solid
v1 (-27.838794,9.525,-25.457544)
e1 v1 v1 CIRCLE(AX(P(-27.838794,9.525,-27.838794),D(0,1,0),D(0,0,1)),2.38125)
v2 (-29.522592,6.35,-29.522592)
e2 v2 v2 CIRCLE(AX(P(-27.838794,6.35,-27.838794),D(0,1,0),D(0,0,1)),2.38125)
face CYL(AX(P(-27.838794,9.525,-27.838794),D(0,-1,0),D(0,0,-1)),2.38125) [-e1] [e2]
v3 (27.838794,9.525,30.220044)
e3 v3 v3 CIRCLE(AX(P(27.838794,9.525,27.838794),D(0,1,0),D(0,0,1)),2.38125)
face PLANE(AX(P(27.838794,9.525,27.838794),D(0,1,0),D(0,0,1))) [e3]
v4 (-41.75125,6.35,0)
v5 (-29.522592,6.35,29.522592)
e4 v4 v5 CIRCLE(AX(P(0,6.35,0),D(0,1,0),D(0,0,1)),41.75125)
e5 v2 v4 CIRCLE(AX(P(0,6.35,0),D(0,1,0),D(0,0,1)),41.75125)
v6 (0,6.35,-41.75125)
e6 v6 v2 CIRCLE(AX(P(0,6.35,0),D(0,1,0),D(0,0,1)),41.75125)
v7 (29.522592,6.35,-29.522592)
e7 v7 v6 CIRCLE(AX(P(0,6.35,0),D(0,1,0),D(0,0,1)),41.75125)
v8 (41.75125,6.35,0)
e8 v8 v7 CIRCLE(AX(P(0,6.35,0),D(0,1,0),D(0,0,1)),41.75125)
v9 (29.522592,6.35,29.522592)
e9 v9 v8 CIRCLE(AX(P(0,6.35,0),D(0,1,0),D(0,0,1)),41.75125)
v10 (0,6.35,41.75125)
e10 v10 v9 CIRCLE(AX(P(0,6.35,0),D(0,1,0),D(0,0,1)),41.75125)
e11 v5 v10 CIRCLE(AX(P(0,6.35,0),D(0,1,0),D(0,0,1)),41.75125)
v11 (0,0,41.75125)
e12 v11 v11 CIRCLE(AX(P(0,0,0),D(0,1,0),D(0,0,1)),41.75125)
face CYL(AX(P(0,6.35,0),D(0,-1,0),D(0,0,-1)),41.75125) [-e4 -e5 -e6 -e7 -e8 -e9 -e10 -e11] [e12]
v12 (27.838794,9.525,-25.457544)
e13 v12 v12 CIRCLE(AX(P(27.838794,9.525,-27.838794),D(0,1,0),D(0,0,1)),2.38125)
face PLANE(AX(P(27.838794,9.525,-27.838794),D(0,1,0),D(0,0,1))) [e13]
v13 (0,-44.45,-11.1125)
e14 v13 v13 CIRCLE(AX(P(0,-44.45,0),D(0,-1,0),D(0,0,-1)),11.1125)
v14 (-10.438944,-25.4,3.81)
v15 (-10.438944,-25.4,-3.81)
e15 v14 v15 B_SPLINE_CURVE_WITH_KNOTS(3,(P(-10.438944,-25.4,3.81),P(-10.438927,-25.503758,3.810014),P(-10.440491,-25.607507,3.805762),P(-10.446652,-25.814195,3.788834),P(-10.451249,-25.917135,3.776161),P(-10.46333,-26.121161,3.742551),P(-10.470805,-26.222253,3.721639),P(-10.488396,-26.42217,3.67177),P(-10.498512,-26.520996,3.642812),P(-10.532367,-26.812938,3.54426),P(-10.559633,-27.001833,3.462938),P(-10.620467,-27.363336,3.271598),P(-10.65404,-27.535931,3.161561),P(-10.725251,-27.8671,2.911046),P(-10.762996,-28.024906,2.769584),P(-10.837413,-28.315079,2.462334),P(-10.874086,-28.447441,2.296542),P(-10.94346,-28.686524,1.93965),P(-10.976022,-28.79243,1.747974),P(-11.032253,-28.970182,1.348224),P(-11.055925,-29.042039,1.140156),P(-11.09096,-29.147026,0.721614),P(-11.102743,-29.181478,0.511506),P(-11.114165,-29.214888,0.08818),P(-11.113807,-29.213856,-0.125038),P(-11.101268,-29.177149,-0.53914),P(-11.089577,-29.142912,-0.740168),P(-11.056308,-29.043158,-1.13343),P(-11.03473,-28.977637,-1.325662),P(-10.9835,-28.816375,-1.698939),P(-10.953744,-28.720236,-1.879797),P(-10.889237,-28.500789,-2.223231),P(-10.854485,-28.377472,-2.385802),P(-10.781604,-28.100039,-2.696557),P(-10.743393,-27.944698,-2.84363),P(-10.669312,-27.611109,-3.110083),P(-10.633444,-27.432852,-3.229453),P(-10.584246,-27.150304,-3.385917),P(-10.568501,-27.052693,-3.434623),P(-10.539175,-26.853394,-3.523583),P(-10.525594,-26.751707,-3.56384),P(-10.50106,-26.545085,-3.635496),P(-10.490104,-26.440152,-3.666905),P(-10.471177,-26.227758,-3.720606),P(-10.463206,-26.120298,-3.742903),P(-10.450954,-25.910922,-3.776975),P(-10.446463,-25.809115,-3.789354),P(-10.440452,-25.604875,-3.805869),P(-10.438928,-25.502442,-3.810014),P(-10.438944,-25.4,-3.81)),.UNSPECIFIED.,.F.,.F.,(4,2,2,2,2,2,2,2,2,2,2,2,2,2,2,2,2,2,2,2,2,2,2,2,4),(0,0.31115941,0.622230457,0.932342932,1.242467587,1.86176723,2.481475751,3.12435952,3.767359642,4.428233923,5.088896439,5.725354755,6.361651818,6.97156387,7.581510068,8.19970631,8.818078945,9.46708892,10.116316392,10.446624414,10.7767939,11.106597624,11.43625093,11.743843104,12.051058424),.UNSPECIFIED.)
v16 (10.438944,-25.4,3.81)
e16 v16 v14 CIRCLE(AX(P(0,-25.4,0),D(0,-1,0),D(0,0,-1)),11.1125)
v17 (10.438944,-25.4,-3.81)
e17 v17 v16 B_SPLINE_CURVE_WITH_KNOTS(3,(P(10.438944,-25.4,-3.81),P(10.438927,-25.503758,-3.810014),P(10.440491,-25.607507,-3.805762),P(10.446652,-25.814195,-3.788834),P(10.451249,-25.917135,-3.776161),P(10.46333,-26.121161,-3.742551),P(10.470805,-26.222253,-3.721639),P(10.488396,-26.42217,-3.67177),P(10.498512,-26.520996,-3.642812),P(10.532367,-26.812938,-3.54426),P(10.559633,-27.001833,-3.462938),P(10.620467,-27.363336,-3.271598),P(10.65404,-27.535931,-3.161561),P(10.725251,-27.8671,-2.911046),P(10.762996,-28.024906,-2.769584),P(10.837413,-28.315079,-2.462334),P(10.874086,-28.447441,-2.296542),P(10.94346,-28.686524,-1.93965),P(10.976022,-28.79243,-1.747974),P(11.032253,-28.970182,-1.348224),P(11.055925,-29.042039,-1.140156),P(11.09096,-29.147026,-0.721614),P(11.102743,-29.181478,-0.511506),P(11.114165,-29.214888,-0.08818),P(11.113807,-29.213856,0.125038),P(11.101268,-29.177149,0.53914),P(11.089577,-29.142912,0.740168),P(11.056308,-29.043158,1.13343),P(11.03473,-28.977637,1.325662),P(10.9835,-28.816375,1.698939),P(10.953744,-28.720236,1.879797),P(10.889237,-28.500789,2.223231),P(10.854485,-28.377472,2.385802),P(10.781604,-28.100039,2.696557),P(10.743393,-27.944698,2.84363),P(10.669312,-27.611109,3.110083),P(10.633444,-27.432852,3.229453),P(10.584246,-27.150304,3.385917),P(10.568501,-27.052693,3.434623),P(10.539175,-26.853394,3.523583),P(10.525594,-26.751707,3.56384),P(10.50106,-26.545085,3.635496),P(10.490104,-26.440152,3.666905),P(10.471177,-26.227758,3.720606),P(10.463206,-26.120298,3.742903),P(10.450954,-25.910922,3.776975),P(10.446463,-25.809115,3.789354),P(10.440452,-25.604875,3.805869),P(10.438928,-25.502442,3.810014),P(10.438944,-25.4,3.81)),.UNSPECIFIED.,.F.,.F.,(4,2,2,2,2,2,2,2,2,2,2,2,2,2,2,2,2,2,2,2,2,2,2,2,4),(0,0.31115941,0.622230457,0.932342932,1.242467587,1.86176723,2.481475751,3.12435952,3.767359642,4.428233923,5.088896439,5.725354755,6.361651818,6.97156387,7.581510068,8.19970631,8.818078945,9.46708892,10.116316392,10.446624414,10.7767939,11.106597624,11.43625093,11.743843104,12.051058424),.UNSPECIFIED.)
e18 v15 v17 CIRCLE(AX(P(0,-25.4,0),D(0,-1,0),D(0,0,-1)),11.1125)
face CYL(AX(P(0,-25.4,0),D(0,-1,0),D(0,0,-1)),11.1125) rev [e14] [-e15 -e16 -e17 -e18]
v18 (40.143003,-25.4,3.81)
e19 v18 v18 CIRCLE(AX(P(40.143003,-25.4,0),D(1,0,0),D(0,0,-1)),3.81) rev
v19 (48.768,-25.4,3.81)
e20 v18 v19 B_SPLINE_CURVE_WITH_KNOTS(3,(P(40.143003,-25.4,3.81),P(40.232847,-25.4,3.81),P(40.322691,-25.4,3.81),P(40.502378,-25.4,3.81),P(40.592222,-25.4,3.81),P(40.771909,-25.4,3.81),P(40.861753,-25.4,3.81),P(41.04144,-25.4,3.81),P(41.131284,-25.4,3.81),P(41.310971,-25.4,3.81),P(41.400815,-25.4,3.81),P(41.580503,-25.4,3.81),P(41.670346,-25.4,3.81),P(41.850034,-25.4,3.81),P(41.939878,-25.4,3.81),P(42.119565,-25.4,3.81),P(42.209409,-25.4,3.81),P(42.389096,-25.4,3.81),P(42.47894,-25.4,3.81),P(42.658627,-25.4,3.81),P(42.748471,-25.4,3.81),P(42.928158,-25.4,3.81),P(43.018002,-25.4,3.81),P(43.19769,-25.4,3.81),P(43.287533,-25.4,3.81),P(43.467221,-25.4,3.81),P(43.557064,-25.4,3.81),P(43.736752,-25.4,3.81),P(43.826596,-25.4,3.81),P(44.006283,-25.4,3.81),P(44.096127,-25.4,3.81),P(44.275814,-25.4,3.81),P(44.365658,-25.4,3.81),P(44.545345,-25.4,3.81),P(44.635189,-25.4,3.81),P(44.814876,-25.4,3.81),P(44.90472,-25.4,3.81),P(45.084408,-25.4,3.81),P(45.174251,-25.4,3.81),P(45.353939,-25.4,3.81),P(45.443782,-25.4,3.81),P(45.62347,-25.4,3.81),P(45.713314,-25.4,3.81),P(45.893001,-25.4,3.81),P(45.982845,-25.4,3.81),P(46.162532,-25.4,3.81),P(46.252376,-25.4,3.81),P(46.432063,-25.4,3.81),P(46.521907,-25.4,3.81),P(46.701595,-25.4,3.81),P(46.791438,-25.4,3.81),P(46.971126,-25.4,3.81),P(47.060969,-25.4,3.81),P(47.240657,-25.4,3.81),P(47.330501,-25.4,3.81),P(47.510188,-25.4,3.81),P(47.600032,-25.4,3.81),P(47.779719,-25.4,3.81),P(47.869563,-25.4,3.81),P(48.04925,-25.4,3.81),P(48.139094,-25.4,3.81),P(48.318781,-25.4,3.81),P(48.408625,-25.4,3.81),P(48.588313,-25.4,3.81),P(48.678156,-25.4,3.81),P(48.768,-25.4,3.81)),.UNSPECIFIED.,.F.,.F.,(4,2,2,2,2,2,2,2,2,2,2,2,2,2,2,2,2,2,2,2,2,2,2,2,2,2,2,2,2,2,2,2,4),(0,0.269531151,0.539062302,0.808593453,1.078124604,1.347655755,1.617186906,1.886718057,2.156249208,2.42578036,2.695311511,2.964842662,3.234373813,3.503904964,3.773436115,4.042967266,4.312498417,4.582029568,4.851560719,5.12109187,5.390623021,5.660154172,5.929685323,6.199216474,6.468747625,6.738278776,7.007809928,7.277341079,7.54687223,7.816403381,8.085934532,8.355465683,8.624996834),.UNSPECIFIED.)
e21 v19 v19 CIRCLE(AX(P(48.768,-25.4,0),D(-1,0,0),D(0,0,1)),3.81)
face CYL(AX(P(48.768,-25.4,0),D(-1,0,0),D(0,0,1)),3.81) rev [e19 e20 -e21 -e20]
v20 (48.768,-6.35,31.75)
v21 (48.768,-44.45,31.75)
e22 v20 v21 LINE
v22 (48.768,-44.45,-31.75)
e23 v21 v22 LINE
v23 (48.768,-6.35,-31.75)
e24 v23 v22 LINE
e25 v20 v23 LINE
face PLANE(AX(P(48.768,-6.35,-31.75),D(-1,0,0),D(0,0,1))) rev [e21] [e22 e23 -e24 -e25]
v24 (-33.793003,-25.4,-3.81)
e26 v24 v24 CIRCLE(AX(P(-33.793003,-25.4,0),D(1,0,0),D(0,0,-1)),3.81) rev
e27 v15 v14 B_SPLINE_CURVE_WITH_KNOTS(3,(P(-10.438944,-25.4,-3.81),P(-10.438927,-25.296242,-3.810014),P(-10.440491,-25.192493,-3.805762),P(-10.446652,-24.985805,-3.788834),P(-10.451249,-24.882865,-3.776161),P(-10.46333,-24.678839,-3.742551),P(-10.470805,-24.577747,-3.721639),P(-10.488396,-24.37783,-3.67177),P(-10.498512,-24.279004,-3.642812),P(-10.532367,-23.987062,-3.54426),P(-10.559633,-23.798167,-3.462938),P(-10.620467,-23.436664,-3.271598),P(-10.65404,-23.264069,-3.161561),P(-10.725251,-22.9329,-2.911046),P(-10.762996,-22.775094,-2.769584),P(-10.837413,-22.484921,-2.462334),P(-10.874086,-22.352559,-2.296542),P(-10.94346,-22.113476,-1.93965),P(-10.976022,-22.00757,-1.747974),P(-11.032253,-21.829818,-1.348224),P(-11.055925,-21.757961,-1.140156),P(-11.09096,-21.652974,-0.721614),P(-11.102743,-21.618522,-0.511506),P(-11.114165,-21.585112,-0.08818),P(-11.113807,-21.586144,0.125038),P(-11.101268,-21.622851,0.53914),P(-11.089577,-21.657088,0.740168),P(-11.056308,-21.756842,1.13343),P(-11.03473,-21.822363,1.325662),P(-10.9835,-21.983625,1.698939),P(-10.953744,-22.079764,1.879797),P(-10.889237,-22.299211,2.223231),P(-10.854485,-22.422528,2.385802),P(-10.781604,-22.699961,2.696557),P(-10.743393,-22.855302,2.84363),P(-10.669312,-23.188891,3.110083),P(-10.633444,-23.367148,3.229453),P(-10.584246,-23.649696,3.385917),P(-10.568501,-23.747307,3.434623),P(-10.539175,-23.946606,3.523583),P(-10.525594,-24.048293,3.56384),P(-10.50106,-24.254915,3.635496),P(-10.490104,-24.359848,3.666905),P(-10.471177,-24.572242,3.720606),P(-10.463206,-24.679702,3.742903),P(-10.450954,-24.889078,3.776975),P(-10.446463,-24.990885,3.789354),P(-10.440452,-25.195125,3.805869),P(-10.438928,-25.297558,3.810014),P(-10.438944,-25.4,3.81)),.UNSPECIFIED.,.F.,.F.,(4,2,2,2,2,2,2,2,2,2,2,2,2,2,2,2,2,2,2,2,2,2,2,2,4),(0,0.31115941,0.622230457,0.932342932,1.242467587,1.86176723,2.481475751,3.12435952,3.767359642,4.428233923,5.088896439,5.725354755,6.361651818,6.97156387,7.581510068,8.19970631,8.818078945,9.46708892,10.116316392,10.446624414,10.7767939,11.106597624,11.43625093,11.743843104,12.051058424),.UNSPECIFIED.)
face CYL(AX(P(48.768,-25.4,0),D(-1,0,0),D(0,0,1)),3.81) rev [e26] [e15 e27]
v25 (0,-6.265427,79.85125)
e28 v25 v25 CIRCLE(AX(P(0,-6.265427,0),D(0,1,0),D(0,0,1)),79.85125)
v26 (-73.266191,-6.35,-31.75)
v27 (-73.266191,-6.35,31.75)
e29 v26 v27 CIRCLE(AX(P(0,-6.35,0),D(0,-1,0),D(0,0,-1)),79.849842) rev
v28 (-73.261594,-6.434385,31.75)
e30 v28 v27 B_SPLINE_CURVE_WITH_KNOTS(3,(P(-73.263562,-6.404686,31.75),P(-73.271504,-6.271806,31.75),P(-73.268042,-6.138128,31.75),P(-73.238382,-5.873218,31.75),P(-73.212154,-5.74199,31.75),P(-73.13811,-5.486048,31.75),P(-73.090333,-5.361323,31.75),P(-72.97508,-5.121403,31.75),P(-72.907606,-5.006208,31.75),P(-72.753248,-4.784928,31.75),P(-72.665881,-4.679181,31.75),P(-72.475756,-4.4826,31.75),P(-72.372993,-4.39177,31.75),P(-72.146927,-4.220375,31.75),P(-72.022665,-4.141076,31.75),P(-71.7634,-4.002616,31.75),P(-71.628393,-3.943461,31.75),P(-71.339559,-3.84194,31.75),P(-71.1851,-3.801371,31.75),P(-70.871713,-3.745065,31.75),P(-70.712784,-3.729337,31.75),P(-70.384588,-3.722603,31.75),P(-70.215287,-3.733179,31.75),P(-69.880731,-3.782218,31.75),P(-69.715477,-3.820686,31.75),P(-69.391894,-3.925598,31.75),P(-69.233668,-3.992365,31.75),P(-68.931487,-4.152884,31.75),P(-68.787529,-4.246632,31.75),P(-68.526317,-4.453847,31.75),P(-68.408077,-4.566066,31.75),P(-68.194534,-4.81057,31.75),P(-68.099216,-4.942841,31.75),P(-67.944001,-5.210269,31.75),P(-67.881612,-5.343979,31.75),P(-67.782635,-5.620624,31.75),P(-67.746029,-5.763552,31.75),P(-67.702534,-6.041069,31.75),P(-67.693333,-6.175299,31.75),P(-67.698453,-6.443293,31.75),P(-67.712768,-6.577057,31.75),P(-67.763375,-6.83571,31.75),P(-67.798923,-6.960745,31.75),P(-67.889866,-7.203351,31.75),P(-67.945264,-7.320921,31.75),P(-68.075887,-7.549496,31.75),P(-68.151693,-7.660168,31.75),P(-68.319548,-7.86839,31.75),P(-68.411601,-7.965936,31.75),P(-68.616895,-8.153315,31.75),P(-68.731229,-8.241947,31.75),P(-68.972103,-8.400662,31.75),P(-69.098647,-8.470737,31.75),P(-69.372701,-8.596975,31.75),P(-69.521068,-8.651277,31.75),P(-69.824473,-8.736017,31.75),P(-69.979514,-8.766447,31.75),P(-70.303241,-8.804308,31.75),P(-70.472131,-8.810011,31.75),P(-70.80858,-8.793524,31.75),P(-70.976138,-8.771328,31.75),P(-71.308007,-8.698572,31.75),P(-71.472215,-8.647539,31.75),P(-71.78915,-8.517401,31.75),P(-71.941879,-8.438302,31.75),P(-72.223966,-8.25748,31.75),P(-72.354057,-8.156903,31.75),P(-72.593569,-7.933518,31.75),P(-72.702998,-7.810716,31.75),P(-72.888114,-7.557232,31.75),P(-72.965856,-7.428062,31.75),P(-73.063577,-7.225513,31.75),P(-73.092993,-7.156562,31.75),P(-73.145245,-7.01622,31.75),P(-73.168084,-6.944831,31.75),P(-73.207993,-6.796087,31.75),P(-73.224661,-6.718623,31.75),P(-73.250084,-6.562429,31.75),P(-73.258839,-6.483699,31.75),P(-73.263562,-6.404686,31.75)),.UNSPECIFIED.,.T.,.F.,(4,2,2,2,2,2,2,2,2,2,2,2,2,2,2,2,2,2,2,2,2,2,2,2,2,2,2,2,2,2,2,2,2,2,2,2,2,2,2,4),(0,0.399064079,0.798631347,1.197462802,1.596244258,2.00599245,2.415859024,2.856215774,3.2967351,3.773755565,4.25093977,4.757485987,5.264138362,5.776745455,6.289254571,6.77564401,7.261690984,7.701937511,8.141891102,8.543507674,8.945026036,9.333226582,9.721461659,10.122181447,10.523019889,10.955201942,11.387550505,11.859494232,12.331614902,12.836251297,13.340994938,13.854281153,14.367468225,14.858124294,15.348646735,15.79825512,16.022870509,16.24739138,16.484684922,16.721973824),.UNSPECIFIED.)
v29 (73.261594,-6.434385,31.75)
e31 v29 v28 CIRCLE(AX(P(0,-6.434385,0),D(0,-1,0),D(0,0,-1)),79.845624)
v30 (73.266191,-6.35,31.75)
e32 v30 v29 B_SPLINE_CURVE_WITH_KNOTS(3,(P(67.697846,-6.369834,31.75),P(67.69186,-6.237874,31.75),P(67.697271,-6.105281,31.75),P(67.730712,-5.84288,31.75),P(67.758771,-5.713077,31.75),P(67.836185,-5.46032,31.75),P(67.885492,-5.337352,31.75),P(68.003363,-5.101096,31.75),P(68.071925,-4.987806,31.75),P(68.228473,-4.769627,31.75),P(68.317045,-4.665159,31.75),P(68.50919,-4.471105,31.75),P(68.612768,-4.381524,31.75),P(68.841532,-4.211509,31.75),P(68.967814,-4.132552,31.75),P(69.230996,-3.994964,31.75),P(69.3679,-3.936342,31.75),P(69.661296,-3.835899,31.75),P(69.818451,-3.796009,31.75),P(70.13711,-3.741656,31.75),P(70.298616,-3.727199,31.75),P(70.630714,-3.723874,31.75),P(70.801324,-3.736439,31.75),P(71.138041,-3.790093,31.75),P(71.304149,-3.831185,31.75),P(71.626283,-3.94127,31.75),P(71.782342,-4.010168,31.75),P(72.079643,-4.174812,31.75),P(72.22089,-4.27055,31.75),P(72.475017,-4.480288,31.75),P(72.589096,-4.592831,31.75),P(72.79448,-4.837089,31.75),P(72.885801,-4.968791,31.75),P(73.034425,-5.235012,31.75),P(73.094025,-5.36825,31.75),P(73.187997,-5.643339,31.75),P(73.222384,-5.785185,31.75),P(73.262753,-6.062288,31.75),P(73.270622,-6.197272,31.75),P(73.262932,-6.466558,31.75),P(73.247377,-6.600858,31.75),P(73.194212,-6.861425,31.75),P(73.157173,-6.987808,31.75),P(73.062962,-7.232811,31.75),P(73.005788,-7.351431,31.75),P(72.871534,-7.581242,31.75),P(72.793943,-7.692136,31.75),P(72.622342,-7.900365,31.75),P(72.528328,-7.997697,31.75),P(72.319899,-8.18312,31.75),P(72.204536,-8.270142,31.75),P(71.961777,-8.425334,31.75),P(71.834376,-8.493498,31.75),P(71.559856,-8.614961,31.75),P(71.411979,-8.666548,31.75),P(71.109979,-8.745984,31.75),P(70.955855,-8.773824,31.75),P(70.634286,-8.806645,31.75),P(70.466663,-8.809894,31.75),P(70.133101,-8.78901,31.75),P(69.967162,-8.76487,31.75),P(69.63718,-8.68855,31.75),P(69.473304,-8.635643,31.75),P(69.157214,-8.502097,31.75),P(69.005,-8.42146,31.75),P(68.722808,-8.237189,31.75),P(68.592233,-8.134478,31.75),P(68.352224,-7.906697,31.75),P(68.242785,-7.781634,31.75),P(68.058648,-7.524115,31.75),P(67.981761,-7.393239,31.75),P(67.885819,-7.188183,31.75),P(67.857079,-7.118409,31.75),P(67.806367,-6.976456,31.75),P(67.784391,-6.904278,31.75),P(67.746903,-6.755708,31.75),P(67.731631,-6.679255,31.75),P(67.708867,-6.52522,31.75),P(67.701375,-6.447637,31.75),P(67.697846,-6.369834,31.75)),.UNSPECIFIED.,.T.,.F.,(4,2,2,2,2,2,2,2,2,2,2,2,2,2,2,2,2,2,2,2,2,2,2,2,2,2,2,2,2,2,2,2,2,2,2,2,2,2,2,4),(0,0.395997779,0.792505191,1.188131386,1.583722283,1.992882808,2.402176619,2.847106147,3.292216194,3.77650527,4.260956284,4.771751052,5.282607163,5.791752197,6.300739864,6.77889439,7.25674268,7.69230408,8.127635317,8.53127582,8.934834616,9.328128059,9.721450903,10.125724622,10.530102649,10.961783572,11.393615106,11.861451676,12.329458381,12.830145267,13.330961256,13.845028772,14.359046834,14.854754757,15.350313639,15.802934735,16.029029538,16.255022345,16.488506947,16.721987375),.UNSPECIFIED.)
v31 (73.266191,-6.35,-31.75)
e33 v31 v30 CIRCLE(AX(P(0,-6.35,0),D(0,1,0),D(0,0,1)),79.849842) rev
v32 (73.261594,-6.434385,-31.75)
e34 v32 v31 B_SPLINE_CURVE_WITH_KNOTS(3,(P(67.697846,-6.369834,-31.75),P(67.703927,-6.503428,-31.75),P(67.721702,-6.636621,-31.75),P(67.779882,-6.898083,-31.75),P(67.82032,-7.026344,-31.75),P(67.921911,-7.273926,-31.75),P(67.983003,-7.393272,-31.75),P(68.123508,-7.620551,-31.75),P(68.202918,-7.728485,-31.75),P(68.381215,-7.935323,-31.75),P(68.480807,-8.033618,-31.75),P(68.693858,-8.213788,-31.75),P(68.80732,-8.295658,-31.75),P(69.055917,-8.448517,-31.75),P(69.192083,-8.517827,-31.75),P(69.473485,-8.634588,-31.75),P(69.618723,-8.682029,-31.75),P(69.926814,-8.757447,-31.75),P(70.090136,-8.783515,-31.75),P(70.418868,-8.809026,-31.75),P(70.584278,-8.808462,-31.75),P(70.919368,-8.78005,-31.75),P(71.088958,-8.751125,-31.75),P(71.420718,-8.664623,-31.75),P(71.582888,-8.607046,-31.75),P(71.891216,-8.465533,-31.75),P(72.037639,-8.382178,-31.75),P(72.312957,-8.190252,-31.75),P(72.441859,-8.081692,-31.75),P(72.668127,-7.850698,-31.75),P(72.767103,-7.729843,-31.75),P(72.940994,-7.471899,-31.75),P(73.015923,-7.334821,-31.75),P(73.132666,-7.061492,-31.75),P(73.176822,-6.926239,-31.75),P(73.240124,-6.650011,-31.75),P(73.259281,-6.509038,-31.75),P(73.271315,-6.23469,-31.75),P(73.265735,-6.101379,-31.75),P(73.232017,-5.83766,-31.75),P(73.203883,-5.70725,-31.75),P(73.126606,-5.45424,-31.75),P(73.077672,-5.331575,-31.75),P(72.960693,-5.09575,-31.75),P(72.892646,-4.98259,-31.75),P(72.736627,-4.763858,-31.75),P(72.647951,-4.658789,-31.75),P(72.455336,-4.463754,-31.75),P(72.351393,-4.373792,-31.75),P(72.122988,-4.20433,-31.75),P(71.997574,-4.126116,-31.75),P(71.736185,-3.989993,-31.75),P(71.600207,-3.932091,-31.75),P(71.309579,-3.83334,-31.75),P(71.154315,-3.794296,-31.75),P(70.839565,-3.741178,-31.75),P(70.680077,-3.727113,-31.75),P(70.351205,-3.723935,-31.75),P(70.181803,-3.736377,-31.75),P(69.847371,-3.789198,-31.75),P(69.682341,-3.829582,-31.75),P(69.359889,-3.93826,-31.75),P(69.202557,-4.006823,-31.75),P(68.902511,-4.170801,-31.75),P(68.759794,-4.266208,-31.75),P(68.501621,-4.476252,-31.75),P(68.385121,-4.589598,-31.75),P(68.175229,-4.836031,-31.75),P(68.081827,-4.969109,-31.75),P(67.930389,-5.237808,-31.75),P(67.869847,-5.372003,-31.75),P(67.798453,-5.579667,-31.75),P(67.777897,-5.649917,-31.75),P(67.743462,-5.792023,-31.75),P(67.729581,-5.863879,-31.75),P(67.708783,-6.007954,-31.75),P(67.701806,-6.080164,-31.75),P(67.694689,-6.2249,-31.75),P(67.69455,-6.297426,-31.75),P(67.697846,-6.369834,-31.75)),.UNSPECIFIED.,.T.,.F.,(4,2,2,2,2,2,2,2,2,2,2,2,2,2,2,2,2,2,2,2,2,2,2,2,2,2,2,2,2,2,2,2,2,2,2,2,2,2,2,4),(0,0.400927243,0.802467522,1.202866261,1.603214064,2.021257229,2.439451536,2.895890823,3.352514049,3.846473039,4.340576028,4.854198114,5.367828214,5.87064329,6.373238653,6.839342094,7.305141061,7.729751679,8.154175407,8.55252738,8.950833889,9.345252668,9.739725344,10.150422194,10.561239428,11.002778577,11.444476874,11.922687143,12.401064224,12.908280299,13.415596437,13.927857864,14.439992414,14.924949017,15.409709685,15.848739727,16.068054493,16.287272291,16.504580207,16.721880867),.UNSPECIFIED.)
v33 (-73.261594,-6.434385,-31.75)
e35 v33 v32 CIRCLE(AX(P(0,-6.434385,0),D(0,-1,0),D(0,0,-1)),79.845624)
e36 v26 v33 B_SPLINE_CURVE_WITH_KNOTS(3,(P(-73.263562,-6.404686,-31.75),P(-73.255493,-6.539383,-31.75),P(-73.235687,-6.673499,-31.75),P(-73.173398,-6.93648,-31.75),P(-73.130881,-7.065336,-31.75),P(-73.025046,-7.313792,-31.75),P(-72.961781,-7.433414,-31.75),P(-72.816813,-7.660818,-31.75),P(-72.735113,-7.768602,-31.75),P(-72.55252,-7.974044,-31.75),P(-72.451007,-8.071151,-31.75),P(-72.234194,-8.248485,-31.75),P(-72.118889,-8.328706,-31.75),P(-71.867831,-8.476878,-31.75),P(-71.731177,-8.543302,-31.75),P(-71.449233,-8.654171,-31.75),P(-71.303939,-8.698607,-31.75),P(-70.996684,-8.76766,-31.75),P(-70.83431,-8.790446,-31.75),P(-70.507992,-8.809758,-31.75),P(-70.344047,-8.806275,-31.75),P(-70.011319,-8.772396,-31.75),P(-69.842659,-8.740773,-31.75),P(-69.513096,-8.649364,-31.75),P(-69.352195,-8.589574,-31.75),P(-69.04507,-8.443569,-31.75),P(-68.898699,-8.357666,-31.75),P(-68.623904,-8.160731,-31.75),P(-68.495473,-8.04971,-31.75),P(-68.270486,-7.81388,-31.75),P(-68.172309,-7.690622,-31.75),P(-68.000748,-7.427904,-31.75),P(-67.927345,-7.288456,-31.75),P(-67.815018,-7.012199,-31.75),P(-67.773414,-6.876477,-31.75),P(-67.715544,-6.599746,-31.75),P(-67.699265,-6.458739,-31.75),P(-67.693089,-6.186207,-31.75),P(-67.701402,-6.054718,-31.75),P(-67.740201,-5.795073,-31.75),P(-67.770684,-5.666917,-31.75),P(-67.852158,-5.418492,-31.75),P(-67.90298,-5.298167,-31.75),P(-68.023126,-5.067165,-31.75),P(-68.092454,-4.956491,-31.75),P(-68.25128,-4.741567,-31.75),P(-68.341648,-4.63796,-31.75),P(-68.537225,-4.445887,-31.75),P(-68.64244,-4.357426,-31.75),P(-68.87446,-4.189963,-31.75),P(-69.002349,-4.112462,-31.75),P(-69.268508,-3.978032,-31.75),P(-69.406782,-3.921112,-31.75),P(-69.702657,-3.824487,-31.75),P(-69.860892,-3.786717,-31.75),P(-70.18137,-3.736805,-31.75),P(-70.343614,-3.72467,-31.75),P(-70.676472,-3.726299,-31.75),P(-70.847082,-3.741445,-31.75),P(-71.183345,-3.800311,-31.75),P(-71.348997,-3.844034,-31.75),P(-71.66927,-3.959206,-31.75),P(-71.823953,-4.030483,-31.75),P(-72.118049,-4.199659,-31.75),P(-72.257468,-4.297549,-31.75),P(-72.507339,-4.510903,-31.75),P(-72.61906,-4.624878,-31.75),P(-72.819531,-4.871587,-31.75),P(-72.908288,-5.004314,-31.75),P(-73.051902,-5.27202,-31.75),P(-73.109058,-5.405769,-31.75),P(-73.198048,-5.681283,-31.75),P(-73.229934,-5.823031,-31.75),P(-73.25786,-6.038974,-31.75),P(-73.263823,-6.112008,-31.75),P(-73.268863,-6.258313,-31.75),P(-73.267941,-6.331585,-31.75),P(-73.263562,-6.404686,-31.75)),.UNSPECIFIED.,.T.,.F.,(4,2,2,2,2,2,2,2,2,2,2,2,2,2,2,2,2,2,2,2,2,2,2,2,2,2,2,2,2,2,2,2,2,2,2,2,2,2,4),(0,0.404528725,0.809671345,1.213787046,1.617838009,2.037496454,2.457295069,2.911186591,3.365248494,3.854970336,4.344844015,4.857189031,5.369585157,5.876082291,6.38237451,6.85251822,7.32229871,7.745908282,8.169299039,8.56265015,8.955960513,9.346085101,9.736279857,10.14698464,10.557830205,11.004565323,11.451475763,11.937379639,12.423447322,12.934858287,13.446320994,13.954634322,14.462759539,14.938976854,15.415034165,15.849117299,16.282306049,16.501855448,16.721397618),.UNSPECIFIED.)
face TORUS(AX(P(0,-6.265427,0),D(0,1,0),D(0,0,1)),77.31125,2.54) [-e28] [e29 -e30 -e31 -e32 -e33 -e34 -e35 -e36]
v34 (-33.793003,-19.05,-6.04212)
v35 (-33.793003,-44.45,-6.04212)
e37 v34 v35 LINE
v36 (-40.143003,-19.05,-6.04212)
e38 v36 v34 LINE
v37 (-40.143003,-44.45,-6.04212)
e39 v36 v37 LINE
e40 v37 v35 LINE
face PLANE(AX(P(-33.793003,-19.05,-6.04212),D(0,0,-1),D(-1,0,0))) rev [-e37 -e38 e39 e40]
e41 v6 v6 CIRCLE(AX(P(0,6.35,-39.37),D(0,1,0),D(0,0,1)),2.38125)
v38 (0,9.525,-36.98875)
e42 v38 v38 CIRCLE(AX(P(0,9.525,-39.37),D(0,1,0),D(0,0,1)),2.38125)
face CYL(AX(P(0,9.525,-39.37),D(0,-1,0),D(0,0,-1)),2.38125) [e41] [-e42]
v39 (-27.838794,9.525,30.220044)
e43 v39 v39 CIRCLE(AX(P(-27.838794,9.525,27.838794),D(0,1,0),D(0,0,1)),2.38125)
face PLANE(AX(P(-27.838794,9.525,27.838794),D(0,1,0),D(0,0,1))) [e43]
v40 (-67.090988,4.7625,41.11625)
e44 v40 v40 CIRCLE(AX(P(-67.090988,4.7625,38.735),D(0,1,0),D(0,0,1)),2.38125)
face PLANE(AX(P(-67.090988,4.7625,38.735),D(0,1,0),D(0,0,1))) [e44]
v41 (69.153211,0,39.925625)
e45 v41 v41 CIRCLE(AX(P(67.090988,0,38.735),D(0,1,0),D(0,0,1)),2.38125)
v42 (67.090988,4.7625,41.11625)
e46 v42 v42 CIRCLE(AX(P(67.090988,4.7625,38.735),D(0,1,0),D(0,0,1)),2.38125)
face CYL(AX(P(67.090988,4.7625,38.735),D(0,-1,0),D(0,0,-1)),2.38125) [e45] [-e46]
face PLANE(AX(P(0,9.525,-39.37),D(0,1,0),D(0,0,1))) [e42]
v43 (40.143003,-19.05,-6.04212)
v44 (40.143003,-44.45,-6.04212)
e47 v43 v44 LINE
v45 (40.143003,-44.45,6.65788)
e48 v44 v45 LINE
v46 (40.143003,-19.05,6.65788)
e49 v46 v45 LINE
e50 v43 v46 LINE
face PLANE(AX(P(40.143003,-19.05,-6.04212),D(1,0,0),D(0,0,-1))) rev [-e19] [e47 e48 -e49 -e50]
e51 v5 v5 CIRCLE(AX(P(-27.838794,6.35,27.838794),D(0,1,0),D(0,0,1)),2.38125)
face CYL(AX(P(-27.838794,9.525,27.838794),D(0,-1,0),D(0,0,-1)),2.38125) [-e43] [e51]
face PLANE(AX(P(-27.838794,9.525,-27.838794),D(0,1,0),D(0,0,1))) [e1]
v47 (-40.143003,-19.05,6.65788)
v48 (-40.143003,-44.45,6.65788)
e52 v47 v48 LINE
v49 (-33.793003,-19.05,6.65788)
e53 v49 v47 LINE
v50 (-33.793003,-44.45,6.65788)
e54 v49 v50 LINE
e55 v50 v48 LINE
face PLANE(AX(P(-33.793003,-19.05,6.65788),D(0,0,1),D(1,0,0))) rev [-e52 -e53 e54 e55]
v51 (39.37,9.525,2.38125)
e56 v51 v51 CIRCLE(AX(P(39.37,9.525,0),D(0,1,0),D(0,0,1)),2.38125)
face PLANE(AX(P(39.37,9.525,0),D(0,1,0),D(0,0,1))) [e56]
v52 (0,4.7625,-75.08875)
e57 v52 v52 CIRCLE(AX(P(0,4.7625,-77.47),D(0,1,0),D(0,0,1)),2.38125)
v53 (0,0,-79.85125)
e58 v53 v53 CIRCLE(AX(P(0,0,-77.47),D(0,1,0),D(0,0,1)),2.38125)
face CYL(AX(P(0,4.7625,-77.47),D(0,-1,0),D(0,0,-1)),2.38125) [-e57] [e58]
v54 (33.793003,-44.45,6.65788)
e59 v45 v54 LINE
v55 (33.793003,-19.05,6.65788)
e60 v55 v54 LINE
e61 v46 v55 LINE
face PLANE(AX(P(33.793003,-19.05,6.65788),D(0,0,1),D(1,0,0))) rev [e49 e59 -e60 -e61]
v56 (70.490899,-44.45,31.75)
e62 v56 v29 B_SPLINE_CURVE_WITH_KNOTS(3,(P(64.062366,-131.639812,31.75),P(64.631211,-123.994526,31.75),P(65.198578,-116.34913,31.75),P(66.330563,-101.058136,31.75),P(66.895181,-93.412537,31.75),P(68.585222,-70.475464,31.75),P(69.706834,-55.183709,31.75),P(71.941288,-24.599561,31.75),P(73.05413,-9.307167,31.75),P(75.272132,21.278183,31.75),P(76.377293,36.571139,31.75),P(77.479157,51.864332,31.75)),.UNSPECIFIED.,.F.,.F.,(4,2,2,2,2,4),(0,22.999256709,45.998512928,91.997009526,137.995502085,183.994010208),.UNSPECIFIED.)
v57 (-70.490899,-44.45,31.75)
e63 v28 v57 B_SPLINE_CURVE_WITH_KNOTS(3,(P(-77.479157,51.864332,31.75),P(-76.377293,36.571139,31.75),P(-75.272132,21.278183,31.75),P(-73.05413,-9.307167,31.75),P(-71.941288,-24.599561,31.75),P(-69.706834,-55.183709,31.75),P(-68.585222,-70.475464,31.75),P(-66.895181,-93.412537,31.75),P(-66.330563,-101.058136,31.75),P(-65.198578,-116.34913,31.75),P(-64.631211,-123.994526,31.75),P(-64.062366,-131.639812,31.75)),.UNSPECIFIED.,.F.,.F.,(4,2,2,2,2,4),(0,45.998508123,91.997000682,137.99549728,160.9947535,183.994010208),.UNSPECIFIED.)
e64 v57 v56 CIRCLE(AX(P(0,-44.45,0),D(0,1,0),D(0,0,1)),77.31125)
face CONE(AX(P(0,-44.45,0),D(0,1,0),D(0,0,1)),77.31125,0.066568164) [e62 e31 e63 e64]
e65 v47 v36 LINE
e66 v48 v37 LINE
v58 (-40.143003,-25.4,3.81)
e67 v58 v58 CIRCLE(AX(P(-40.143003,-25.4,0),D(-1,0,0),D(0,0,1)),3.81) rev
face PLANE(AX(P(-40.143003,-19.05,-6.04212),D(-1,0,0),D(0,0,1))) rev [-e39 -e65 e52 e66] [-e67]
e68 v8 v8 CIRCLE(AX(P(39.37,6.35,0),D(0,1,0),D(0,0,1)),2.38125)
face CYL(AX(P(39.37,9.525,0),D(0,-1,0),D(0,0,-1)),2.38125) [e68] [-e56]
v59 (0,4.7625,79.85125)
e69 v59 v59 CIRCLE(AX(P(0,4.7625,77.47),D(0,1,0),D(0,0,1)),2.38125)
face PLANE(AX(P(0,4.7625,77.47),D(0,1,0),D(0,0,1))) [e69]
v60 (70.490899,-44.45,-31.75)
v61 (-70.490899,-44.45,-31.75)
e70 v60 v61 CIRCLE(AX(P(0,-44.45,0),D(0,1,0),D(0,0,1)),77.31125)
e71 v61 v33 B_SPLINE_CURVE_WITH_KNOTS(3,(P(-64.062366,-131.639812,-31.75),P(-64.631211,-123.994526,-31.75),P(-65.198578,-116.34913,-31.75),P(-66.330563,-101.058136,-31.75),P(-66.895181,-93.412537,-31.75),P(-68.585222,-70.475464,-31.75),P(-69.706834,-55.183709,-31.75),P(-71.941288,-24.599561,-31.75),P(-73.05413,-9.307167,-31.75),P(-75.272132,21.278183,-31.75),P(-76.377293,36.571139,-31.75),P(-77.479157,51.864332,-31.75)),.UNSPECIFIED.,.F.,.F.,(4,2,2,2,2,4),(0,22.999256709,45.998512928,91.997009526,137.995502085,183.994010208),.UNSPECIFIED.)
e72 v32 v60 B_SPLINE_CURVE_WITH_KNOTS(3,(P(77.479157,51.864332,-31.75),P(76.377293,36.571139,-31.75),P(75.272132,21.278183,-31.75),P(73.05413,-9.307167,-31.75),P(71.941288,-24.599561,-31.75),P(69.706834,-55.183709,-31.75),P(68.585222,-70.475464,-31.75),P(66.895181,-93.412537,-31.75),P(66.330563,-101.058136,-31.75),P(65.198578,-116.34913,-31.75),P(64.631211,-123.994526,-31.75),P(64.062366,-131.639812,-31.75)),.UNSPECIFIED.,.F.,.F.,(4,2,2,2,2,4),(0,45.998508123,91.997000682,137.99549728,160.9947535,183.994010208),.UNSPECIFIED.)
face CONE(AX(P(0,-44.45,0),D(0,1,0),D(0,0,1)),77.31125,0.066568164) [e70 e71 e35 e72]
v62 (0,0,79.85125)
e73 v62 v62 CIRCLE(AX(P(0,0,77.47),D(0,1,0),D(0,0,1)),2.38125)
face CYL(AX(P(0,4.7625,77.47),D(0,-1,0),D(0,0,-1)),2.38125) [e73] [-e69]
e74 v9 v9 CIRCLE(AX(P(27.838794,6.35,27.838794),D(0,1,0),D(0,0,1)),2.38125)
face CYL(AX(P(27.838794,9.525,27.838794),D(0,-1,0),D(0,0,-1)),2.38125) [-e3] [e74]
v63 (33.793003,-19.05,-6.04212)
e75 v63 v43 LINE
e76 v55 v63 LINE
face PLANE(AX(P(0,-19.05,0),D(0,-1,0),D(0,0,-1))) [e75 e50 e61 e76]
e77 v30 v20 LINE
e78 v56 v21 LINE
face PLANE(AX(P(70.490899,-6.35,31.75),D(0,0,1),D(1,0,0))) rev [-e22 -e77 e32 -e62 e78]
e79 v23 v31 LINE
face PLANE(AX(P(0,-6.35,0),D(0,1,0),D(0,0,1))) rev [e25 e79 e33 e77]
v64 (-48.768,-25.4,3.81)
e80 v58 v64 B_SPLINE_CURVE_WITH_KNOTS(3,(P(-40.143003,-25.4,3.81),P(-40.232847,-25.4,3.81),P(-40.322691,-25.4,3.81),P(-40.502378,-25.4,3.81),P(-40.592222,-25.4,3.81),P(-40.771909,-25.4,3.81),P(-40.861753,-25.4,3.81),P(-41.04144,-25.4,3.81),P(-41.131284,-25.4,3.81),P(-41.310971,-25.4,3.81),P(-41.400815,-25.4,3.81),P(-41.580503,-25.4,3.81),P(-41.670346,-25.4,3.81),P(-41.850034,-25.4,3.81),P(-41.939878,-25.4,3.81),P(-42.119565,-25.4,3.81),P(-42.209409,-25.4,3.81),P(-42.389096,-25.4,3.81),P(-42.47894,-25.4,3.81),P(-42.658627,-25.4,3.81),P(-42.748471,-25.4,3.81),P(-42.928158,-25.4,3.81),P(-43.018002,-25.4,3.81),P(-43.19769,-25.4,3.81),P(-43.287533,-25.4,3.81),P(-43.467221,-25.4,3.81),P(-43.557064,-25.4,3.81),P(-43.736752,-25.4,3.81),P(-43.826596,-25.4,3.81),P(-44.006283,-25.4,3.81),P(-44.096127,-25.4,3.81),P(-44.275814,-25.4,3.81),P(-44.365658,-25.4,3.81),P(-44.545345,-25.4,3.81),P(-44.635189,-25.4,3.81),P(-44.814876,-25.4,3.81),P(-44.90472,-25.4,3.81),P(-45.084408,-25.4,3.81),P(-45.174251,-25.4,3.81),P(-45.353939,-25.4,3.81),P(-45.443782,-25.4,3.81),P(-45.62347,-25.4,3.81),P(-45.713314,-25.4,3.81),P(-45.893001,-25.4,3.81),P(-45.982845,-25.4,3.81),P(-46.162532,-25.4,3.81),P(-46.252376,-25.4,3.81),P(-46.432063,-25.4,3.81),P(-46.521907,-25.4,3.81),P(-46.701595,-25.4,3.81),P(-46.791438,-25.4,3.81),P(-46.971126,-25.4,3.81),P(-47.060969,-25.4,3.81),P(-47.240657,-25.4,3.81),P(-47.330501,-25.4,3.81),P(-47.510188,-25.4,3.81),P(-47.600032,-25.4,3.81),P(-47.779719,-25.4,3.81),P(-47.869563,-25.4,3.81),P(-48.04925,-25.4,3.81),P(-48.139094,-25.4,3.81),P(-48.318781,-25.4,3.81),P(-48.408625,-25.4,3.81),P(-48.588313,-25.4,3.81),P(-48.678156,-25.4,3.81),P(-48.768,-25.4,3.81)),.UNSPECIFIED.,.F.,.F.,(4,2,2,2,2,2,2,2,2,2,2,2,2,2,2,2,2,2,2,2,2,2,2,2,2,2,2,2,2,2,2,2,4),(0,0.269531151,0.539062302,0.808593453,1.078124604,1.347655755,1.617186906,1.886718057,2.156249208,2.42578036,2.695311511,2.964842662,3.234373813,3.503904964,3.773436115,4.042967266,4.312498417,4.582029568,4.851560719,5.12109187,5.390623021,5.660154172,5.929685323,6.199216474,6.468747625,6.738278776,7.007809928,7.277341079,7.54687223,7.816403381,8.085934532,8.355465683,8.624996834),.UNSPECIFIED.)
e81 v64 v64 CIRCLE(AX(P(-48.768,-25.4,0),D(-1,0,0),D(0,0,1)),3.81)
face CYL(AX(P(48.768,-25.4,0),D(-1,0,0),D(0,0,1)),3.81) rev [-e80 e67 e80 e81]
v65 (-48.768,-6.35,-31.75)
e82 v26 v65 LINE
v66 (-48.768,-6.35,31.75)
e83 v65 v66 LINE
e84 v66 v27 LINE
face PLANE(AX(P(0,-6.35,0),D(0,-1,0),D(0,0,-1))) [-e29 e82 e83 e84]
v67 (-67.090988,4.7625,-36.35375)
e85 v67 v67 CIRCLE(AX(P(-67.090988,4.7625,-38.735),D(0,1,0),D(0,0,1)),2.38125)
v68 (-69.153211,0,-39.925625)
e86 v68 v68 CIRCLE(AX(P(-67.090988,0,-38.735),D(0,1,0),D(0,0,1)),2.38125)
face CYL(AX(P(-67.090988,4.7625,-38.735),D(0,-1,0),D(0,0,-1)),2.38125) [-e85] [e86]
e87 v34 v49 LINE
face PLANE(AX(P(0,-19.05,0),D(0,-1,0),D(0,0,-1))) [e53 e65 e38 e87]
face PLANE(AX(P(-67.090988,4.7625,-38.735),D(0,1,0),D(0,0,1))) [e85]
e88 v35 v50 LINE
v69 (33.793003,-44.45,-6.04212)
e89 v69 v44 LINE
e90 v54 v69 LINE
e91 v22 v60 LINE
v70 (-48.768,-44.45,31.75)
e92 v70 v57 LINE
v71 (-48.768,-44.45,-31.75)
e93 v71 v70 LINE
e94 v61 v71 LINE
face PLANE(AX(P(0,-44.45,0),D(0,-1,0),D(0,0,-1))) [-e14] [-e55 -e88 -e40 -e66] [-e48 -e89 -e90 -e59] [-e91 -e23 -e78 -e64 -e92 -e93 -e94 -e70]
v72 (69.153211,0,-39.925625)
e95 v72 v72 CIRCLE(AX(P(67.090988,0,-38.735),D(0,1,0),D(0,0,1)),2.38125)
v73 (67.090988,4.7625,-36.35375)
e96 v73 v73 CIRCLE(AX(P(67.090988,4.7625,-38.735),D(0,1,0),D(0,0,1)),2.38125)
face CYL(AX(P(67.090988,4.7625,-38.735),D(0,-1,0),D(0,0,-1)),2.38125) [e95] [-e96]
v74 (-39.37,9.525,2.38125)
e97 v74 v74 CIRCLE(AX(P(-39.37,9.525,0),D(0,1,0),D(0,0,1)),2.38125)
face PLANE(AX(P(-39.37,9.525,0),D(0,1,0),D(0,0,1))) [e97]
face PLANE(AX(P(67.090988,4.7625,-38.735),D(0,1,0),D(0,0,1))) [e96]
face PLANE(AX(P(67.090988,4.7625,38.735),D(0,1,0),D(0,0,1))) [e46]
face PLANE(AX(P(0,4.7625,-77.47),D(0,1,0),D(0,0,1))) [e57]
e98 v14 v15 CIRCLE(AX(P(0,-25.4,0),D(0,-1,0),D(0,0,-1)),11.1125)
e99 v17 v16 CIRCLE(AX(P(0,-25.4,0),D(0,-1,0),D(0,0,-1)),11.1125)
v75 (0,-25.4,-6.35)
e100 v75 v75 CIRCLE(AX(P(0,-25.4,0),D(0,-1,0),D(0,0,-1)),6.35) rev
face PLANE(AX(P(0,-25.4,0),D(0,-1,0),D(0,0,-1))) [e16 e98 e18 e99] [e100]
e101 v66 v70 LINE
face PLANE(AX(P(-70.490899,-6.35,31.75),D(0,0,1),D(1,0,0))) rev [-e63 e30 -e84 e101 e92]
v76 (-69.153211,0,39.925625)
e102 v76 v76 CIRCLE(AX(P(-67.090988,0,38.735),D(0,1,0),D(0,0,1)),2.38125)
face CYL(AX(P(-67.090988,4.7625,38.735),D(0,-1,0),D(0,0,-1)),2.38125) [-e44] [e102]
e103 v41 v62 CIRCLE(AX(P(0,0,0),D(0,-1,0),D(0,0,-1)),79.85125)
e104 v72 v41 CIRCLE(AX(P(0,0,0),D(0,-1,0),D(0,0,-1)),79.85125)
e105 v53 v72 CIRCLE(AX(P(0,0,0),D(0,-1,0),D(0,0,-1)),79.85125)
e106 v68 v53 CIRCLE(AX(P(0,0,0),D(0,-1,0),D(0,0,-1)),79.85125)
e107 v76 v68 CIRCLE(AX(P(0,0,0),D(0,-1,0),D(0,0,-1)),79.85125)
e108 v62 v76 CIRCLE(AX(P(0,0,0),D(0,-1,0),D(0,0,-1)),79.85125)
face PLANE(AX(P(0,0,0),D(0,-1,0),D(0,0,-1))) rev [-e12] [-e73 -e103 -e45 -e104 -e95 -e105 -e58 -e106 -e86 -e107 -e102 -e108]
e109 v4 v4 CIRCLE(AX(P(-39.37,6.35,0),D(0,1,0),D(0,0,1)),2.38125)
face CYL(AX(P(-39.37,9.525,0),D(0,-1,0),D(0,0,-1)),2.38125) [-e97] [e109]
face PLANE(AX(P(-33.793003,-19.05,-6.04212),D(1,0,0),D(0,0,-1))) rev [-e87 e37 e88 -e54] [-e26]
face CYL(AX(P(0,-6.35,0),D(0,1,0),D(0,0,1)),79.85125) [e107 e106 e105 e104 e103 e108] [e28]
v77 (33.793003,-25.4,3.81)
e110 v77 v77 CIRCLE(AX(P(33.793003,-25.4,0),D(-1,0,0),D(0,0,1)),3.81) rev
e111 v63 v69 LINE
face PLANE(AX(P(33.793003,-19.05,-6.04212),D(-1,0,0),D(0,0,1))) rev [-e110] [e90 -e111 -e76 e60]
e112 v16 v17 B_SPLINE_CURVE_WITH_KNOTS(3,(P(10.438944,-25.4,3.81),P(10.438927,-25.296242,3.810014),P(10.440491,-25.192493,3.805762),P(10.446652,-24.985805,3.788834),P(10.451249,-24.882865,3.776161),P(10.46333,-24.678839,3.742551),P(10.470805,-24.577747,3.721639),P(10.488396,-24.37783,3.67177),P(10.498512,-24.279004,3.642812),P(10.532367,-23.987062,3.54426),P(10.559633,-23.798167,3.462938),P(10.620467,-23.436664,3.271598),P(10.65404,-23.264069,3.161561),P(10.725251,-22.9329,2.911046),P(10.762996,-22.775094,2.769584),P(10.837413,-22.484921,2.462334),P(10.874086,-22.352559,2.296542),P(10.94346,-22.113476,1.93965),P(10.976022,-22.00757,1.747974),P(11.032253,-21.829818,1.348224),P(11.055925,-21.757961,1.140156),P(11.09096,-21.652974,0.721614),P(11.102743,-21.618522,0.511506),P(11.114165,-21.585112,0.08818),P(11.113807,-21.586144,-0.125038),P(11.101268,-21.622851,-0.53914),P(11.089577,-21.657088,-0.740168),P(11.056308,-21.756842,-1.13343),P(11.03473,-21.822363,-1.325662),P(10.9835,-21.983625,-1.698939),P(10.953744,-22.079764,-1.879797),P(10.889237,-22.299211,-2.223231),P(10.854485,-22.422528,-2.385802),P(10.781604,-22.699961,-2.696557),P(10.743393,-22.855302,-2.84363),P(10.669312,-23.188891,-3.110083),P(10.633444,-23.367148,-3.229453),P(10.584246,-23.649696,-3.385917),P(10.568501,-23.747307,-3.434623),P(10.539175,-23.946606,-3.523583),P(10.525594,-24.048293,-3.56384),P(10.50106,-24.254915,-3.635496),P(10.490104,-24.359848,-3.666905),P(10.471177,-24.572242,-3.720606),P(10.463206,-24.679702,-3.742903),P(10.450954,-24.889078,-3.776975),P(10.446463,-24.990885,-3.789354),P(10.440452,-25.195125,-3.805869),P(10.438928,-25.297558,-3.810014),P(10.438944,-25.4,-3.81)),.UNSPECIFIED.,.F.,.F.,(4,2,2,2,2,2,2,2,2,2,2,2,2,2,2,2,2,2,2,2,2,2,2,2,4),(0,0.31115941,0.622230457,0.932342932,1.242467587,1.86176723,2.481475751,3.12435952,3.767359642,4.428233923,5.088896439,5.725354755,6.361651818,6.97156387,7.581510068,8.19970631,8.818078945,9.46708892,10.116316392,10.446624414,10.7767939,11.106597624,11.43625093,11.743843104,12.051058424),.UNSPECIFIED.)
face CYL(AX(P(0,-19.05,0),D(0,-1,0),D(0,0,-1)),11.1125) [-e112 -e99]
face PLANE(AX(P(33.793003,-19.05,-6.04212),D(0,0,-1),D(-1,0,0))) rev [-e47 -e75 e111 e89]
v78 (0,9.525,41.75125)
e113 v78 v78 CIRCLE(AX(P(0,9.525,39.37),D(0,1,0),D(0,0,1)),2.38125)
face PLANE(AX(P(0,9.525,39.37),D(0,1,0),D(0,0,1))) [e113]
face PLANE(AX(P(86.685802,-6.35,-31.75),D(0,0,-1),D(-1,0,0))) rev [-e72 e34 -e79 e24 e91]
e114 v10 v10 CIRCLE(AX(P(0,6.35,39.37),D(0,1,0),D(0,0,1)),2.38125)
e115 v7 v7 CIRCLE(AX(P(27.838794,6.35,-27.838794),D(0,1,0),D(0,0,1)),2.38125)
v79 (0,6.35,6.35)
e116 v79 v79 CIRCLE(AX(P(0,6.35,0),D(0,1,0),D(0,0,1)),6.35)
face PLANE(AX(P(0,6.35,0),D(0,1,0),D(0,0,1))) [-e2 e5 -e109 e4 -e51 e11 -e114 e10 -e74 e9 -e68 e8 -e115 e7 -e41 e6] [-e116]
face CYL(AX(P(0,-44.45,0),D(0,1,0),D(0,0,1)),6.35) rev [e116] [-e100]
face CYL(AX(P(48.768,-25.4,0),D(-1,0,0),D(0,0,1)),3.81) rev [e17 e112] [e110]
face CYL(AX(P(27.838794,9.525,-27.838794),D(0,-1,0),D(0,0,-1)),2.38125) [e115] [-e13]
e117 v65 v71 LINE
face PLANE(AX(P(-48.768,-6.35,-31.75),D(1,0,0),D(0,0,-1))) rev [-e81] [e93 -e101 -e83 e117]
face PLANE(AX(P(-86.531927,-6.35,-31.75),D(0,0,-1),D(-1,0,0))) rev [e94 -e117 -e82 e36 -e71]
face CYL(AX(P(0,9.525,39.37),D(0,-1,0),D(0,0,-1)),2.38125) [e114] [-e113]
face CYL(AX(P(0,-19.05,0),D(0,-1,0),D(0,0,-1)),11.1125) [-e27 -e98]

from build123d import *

# Parameters (mm, degrees)
SKETCH1_R           = 41.75125
BOSS_EXTRUDE1_DEPTH = 6.35
SKETCH2_R           = 2.38125
BOSS_EXTRUDE2_DEPTH = 3.175
SKETCH3_R           = 79.85125
BOSS_EXTRUDE3_DEPTH = 6.35
SKETCH4_R           = 2.38125
BOSS_EXTRUDE4_DEPTH = 4.7625
SKETCH5_R           = 77.31125
BOSS_EXTRUDE5_DEPTH = 38.1
FILLET1_R           = 2.54
CUT_EXTRUDE1_DEPTH  = 38.1
SKETCH8_R           = 3.81
CUT_EXTRUDE2_DEPTH  = 97.536
SKETCH9_R           = 6.35
CUT_EXTRUDE3_DEPTH  = 50.8
SKETCH10_R          = 11.1125
CUT_EXTRUDE4_DEPTH  = 19.05
SKETCH11_W          = 6.35
SKETCH11_H          = 12.7
CUT_EXTRUDE5_DEPTH  = 25.4
SKETCH12_R          = 11.1125
SKETCH12_R_2        = 6.35
BOSS_EXTRUDE6_DEPTH = 6.35


with BuildPart() as part:
    # Sketch1 → Boss-Extrude1 (new body)
    with BuildSketch(Plane(origin=(0, 0, 0), x_dir=(1, 0, 0), z_dir=(0, 1, 0))):
        with Locations(Location((0, 0, 0), (0, 0, 270))):
            Circle(SKETCH1_R)
    extrude(amount=BOSS_EXTRUDE1_DEPTH)

    # Sketch2 → Boss-Extrude2 (add)
    with BuildSketch(Plane(origin=(0, 6.35, 0), x_dir=(1, 0, 0), z_dir=(0, 1, 0))):
        with Locations(Location((0, 39.37, 0), (0, 0, 89.99945926))):
            Circle(SKETCH2_R)
        with Locations(Location((27.838793975, 27.838793975, 0), (0, 0, 44.999445214))):
            Circle(SKETCH2_R)
        with Locations(Location((39.37, 0, 0), (0, 0, 359.999429558))):
            Circle(SKETCH2_R)
        with Locations(Location((27.838793975, -27.838793975, 0), (0, 0, 314.999421479))):
            Circle(SKETCH2_R)
        with Locations(Location((0, -39.37, 0), (0, 0, 269.999424945))):
            Circle(SKETCH2_R)
        with Locations(Location((-27.838793975, -27.838793975, 0), (0, 0, 224.999438328))):
            Circle(SKETCH2_R)
        with Locations(Location((-39.37, 0, 0), (0, 0, 179.999453674))):
            Circle(SKETCH2_R)
        with Locations(Location((-27.838793975, 27.838793975, 0), (0, 0, 134.999462078))):
            Circle(SKETCH2_R)
    extrude(amount=BOSS_EXTRUDE2_DEPTH)

    # Sketch3 → Boss-Extrude3 (add)
    with BuildSketch(Plane.XZ):
        with Locations(Location((0, 0, 0), (0, 0, 270))):
            Circle(SKETCH3_R)
    extrude(amount=BOSS_EXTRUDE3_DEPTH)

    # Sketch4 → Boss-Extrude4 (add)
    with BuildSketch(Plane(origin=(0, 0, 0), x_dir=(1, 0, 0), z_dir=(0, 1, 0))):
        with Locations(Location((0, 77.47, 0), (0, 0, 89.999466901))):
            Circle(SKETCH4_R)
        with Locations(Location((67.090988031, 38.735, 0), (0, 0, 29.999456844))):
            Circle(SKETCH4_R)
        with Locations(Location((67.090988031, -38.735, 0), (0, 0, 329.999448342))):
            Circle(SKETCH4_R)
        with Locations(Location((0, -77.47, 0), (0, 0, 270))):
            Circle(SKETCH4_R)
        with Locations(Location((-67.090988031, -38.735, 0), (0, 0, 209.999457825))):
            Circle(SKETCH4_R)
        with Locations(Location((-67.090988031, 38.735, 0), (0, 0, 149.999465475))):
            Circle(SKETCH4_R)
    extrude(amount=BOSS_EXTRUDE4_DEPTH)

    # Sketch5 → Boss-Extrude5 (add)
    with BuildSketch(Plane.XZ.offset(6.35)):
        with Locations(Location((0, 0, 0), (0, 0, 90))):
            Circle(SKETCH5_R)
    extrude(amount=BOSS_EXTRUDE5_DEPTH)

    # Sketch6 → Revolve1 (revolve)
    with BuildSketch(Plane(origin=(0, 0, 0), x_dir=(0, 0, -1), z_dir=(1, 0, 0)), mode=Mode.PRIVATE) as revolve1_sk:
        Polygon((77.31125, -6.35), (77.31125, -44.45), (79.85125, -6.35), align=None)
    revolve(revolve1_sk.sketch.rotate(Axis((0, 12.22375, 0), (0, -1, 0)), 180), axis=Axis((0, 12.22375, 0), (0, -1, 0)))

    # Fillet1
    # the kernel refuses this fillet: 2.54 mm, written as the material it takes off along each edge
    with BuildSketch(Plane(origin=(0, -6.35, 0), x_dir=(0, 0, 1), z_dir=(1, 0, 0))) as fillet1_piece_1:
        with BuildLine():
            CenterArc((79.85125 - FILLET1_R, -FILLET1_R * 0.0332963783729), FILLET1_R, 0, 3.814074834)
            Line((79.85125 - FILLET1_R * 0.00221484214339, FILLET1_R * 0.0332226321509), (79.85125, 0))
            Line((79.85125, 0), (79.85125, -FILLET1_R * 0.0332963783729))
        make_face()
    revolve(axis=Axis((0, -6.35, 0), (0, -1, 0)), revolution_arc=180, mode=Mode.SUBTRACT)
    with BuildSketch(Plane(origin=(0, -6.35, 0), x_dir=(0, 0, -1), z_dir=(-1, 0, 0))) as fillet1_piece_2:
        with BuildLine():
            CenterArc((79.85125 - FILLET1_R, -FILLET1_R * 0.0332963783729), FILLET1_R, 0, 3.814074834)
            Line((79.85125 - FILLET1_R * 0.00221484214339, FILLET1_R * 0.0332226321509), (79.85125, 0))
            Line((79.85125, 0), (79.85125, -FILLET1_R * 0.0332963783729))
        make_face()
    revolve(axis=Axis((0, -6.35, 0), (0, -1, 0)), revolution_arc=180, mode=Mode.SUBTRACT)

    # Sketch7 → Cut-Extrude1 (cut)
    with BuildSketch(Plane.XZ.offset(44.45)):
        Polygon((48.768, -31.75), (48.768, 31.75), (70.490899246, 31.75), (86.685802419, 31.75), (86.685802419, -31.75), (70.490899246, -31.75), align=None)
        Polygon((-48.768, -31.75), (-48.768, 31.75), (-70.490899246, 31.75), (-86.531926913, 31.75), (-86.531926913, -31.75), (-70.490899246, -31.75), align=None)
    extrude(amount=-CUT_EXTRUDE1_DEPTH, mode=Mode.SUBTRACT)

    # Sketch8 → Cut-Extrude2 (cut)
    with BuildSketch(Plane.ZY.offset(48.768)):
        with Locations((0, -25.4)):
            Circle(SKETCH8_R)
    extrude(amount=-CUT_EXTRUDE2_DEPTH, mode=Mode.SUBTRACT)

    # Sketch9 → Cut-Extrude3 (cut)
    with BuildSketch(Plane(origin=(0, 6.35, 0), x_dir=(1, 0, 0), z_dir=(0, 1, 0))):
        with Locations(Location((0, 0, 0), (0, 0, 270))):
            Circle(SKETCH9_R)
    extrude(amount=-CUT_EXTRUDE3_DEPTH, mode=Mode.SUBTRACT)

    # Sketch10 → Cut-Extrude4 (cut)
    with BuildSketch(Plane.XZ.offset(44.45)):
        with Locations(Location((0, 0, 0), (0, 0, 270))):
            Circle(SKETCH10_R)
    extrude(amount=-CUT_EXTRUDE4_DEPTH, mode=Mode.SUBTRACT)

    # Sketch11 → Cut-Extrude5 (cut)
    with BuildSketch(Plane.XZ.offset(44.45)):
        with Locations((36.968003166, 0.307880226)):
            Rectangle(SKETCH11_W, SKETCH11_H)
        with Locations((-36.968003166, 0.307880226)):
            Rectangle(SKETCH11_W, SKETCH11_H)
    extrude(amount=-CUT_EXTRUDE5_DEPTH, mode=Mode.SUBTRACT)

    # Sketch12 → Boss-Extrude6 (add)
    with BuildSketch(Plane.XZ.offset(25.4)):
        with Locations(Location((0, 0, 0), (0, 0, 270))):
            Circle(SKETCH12_R)
        with Locations(Location((0, 0, 0), (0, 0, 90))):
            Circle(SKETCH12_R_2, mode=Mode.SUBTRACT)
    extrude(amount=-BOSS_EXTRUDE6_DEPTH)


solid = part.part
